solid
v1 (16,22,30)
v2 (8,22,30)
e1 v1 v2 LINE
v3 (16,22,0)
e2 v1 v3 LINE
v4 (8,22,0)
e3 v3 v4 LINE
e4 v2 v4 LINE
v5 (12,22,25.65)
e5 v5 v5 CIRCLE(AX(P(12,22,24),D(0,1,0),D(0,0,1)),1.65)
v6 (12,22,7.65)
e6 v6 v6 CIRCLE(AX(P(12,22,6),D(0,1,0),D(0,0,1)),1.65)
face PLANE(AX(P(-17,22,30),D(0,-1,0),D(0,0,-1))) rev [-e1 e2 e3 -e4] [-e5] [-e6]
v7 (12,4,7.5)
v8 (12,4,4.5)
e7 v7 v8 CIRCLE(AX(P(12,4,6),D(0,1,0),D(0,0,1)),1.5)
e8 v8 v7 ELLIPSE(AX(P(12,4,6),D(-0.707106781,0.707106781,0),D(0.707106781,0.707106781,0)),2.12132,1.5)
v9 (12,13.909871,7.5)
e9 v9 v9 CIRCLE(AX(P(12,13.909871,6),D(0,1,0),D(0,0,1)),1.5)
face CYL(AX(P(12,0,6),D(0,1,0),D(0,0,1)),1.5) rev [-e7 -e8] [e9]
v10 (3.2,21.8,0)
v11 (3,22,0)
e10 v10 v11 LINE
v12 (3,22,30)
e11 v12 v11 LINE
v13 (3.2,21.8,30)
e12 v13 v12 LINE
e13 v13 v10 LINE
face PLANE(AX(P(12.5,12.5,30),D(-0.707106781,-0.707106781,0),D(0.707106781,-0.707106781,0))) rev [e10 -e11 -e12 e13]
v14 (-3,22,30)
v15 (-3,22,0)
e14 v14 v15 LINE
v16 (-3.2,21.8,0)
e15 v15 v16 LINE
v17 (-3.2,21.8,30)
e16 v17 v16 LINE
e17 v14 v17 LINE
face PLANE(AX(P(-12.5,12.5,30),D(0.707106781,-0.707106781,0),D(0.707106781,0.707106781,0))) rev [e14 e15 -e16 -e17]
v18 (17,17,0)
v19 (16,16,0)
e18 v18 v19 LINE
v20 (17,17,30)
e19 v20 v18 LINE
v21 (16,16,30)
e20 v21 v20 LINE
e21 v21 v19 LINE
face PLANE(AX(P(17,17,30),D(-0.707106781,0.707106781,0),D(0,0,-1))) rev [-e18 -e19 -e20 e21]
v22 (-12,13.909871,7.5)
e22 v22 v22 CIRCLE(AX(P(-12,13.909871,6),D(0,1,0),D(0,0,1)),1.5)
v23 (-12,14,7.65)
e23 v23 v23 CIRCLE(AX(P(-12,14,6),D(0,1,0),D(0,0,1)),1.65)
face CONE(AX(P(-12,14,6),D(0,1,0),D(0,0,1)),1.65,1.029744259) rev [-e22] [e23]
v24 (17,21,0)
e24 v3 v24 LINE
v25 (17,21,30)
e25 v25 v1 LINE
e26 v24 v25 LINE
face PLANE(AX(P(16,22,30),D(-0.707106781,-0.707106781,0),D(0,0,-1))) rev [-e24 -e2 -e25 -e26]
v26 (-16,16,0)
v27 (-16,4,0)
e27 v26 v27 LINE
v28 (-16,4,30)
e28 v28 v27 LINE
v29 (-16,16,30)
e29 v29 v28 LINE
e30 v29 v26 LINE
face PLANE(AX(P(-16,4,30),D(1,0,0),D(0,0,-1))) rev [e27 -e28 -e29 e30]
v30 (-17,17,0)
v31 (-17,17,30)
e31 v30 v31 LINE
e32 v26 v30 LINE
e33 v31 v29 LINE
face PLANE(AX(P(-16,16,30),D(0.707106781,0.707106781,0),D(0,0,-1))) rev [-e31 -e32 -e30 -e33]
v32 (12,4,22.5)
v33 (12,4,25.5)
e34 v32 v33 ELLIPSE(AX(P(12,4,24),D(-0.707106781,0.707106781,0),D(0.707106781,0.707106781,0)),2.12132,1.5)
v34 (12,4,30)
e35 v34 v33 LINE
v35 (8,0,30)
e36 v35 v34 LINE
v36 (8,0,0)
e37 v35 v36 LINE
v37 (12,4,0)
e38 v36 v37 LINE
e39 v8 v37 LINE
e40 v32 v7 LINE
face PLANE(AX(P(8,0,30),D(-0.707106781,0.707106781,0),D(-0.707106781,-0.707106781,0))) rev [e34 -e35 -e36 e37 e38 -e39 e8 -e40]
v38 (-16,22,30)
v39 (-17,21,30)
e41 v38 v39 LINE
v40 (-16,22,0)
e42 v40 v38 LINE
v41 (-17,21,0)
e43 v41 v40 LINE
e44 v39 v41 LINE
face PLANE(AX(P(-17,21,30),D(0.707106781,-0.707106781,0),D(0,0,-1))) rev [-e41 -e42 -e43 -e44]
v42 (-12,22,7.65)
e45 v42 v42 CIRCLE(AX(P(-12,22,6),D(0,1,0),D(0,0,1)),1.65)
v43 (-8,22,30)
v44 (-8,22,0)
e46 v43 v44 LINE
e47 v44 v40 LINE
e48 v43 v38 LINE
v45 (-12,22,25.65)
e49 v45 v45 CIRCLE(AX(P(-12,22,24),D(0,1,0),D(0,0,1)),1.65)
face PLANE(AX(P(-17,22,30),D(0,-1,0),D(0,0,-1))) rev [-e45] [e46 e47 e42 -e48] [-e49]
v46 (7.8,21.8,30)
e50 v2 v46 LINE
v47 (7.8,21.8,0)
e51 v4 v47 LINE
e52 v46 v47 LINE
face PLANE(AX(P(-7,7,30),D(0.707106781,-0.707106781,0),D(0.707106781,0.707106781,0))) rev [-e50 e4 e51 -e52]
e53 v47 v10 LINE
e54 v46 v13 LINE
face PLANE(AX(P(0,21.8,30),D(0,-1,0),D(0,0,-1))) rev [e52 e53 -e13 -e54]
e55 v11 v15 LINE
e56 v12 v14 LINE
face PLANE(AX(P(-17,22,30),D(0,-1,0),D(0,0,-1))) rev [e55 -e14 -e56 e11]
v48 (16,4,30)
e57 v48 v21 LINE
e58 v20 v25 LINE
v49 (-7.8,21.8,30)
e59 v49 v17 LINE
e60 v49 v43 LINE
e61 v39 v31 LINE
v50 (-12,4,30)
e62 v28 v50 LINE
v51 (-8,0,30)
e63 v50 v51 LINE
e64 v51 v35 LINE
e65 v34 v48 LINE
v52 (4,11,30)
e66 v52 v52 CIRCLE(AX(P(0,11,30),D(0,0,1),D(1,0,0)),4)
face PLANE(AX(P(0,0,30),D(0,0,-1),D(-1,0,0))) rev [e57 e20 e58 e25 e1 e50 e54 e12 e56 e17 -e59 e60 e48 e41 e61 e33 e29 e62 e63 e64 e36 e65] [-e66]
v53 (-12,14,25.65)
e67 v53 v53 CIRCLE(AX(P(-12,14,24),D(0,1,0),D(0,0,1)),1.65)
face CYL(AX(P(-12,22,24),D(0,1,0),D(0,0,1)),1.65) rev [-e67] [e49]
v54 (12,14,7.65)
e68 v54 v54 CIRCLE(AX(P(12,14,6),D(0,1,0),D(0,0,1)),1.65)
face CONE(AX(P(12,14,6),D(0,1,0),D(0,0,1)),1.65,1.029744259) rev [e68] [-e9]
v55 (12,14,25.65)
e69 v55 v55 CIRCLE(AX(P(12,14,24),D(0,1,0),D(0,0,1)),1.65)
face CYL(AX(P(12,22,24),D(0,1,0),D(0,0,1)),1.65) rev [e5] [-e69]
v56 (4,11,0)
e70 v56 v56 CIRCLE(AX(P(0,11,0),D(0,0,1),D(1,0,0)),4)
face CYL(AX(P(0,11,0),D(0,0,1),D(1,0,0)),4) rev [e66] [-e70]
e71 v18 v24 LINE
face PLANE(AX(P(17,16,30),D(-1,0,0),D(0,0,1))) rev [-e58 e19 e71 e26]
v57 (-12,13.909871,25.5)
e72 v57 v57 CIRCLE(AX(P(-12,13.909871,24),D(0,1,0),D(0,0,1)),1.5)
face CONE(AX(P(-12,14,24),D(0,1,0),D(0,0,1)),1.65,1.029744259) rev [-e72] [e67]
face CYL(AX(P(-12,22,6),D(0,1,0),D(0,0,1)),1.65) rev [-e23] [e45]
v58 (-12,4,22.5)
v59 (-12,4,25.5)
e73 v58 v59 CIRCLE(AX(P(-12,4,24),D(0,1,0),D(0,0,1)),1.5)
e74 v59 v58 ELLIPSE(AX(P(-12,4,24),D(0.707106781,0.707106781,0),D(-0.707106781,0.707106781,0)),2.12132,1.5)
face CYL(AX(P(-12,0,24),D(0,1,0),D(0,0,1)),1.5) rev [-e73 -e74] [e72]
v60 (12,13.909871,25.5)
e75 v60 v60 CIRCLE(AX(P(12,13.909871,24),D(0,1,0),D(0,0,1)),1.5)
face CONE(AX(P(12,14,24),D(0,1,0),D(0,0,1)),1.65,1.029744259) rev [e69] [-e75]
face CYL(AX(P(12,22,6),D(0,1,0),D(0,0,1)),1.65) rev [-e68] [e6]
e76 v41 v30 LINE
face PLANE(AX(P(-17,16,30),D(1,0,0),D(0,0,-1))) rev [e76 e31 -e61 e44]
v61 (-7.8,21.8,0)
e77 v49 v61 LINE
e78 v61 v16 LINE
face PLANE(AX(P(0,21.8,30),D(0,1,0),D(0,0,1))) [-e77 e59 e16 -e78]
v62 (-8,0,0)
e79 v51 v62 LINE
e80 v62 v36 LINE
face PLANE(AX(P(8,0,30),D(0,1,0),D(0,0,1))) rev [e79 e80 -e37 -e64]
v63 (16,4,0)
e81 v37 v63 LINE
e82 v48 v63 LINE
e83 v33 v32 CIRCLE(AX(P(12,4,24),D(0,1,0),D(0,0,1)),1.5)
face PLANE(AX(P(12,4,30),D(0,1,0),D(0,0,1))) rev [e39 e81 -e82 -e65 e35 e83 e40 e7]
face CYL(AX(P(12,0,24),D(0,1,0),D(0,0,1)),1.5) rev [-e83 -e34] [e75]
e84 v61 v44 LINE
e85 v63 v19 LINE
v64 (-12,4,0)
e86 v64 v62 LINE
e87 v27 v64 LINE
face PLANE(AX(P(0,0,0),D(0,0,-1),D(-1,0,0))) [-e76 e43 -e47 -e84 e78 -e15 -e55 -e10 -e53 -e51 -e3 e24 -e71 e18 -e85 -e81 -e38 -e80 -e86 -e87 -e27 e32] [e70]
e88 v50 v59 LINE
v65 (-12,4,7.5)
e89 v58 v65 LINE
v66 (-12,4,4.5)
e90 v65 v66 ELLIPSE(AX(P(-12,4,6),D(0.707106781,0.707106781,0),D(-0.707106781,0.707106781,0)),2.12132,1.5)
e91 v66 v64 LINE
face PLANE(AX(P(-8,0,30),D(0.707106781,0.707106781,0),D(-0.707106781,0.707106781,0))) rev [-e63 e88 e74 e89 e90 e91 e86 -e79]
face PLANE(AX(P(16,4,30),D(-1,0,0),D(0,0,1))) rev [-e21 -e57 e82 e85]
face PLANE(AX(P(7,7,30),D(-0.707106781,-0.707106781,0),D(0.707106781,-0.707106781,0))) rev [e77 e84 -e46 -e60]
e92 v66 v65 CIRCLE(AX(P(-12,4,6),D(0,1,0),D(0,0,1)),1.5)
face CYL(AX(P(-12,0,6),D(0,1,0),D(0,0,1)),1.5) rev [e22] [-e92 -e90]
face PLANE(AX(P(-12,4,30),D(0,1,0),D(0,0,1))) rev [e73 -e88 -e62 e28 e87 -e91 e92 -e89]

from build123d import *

# Parameters (mm, degrees)
BOSS_EXTRUDE1_DEPTH     = 30
SKETCH2_R               = 4
CUT_EXTRUDE1_DEPTH      = 41.902322672
CHAMFER1_SIZE           = 1
CUT_EXTRUDE3_DEPTH      = 41.902322672
CUT_EXTRUDE3_DEPTH_BACK = 41.902322672
SKETCH7_R               = 1.5
M4_TAPPED_HOLE1_D       = 3.3
M4_TAPPED_HOLE1_DEPTH   = 8
M4_TAPPED_HOLE1_TIP     = 0.991420021
CUT_EXTRUDE4_DEPTH      = 41.902322672


with BuildPart() as part:
    # Sketch1 → Boss-Extrude1 (new body)
    with BuildSketch(Plane.XY):
        Polygon((8, 0), (-8, 0), (-12, 4), (-16, 4), (-16, 16), (-17, 16), (-17, 22), (17, 22), (17, 16), (16, 16), (16, 4), (12, 4), align=None)
    extrude(amount=BOSS_EXTRUDE1_DEPTH)

    # Sketch2 → Cut-Extrude1 (cut, through all)
    with BuildSketch(Plane.XY.offset(30)):
        with Locations((0, 11)):
            Circle(SKETCH2_R)
    extrude(amount=-CUT_EXTRUDE1_DEPTH, mode=Mode.SUBTRACT)

    # Chamfer1
    chamfer1_edges = [part.edges().sort_by_distance(p)[0] for p in [
        (-17, 16, 15),
        (17, 16, 15),
        (-17, 22, 15),
        (17, 22, 15),
    ]]
    chamfer(chamfer1_edges, length=CHAMFER1_SIZE - 0.0001)  # a hair under: the kernel refuses the full size

    # Sketch7 → Cut-Extrude3 (cut, two sides: drawn at the far end of the back side and taken through both)
    with BuildSketch(Plane(origin=(0, 22, 0), x_dir=(1, 0, 0), z_dir=(0, 1, 0)).offset(-CUT_EXTRUDE3_DEPTH_BACK)):
        with Locations(Location((-12, -6, 0), (0, 0, 90))):
            Circle(SKETCH7_R)
        with Locations(Location((-12, -24, 0), (0, 0, 90))):
            Circle(SKETCH7_R)
        with Locations(Location((12, -6, 0), (0, 0, 90))):
            Circle(SKETCH7_R)
        with Locations(Location((12, -24, 0), (0, 0, 90))):
            Circle(SKETCH7_R)
    extrude(amount=CUT_EXTRUDE3_DEPTH + CUT_EXTRUDE3_DEPTH_BACK, mode=Mode.SUBTRACT)

    # M4 Tapped Hole1
    with Locations(Plane(origin=(0, 22, 0), x_dir=(1, 0, 0), z_dir=(0, 1, 0))):
        with Locations((-12, -6), (12, -6), (-12, -24), (12, -24)):
            Hole(M4_TAPPED_HOLE1_D / 2, depth=M4_TAPPED_HOLE1_DEPTH)
            with Locations((0, 0, -(M4_TAPPED_HOLE1_DEPTH + M4_TAPPED_HOLE1_TIP / 2))):  # 118° drill point
                Cone(0, M4_TAPPED_HOLE1_D / 2, M4_TAPPED_HOLE1_TIP, mode=Mode.SUBTRACT)

    # Sketch8 → Cut-Extrude4 (cut, through all)
    with BuildSketch(Plane(origin=(0, 0, 0), x_dir=(-1, 0, 0), z_dir=(0, 0, -1))):
        Polygon((8, 22), (3, 22), (3.2, 21.8), (7.8, 21.8), align=None)
        Polygon((-3, 22), (-8, 22), (-7.8, 21.8), (-3.2, 21.8), align=None)
    extrude(amount=-CUT_EXTRUDE4_DEPTH, mode=Mode.SUBTRACT)


solid = part.part
